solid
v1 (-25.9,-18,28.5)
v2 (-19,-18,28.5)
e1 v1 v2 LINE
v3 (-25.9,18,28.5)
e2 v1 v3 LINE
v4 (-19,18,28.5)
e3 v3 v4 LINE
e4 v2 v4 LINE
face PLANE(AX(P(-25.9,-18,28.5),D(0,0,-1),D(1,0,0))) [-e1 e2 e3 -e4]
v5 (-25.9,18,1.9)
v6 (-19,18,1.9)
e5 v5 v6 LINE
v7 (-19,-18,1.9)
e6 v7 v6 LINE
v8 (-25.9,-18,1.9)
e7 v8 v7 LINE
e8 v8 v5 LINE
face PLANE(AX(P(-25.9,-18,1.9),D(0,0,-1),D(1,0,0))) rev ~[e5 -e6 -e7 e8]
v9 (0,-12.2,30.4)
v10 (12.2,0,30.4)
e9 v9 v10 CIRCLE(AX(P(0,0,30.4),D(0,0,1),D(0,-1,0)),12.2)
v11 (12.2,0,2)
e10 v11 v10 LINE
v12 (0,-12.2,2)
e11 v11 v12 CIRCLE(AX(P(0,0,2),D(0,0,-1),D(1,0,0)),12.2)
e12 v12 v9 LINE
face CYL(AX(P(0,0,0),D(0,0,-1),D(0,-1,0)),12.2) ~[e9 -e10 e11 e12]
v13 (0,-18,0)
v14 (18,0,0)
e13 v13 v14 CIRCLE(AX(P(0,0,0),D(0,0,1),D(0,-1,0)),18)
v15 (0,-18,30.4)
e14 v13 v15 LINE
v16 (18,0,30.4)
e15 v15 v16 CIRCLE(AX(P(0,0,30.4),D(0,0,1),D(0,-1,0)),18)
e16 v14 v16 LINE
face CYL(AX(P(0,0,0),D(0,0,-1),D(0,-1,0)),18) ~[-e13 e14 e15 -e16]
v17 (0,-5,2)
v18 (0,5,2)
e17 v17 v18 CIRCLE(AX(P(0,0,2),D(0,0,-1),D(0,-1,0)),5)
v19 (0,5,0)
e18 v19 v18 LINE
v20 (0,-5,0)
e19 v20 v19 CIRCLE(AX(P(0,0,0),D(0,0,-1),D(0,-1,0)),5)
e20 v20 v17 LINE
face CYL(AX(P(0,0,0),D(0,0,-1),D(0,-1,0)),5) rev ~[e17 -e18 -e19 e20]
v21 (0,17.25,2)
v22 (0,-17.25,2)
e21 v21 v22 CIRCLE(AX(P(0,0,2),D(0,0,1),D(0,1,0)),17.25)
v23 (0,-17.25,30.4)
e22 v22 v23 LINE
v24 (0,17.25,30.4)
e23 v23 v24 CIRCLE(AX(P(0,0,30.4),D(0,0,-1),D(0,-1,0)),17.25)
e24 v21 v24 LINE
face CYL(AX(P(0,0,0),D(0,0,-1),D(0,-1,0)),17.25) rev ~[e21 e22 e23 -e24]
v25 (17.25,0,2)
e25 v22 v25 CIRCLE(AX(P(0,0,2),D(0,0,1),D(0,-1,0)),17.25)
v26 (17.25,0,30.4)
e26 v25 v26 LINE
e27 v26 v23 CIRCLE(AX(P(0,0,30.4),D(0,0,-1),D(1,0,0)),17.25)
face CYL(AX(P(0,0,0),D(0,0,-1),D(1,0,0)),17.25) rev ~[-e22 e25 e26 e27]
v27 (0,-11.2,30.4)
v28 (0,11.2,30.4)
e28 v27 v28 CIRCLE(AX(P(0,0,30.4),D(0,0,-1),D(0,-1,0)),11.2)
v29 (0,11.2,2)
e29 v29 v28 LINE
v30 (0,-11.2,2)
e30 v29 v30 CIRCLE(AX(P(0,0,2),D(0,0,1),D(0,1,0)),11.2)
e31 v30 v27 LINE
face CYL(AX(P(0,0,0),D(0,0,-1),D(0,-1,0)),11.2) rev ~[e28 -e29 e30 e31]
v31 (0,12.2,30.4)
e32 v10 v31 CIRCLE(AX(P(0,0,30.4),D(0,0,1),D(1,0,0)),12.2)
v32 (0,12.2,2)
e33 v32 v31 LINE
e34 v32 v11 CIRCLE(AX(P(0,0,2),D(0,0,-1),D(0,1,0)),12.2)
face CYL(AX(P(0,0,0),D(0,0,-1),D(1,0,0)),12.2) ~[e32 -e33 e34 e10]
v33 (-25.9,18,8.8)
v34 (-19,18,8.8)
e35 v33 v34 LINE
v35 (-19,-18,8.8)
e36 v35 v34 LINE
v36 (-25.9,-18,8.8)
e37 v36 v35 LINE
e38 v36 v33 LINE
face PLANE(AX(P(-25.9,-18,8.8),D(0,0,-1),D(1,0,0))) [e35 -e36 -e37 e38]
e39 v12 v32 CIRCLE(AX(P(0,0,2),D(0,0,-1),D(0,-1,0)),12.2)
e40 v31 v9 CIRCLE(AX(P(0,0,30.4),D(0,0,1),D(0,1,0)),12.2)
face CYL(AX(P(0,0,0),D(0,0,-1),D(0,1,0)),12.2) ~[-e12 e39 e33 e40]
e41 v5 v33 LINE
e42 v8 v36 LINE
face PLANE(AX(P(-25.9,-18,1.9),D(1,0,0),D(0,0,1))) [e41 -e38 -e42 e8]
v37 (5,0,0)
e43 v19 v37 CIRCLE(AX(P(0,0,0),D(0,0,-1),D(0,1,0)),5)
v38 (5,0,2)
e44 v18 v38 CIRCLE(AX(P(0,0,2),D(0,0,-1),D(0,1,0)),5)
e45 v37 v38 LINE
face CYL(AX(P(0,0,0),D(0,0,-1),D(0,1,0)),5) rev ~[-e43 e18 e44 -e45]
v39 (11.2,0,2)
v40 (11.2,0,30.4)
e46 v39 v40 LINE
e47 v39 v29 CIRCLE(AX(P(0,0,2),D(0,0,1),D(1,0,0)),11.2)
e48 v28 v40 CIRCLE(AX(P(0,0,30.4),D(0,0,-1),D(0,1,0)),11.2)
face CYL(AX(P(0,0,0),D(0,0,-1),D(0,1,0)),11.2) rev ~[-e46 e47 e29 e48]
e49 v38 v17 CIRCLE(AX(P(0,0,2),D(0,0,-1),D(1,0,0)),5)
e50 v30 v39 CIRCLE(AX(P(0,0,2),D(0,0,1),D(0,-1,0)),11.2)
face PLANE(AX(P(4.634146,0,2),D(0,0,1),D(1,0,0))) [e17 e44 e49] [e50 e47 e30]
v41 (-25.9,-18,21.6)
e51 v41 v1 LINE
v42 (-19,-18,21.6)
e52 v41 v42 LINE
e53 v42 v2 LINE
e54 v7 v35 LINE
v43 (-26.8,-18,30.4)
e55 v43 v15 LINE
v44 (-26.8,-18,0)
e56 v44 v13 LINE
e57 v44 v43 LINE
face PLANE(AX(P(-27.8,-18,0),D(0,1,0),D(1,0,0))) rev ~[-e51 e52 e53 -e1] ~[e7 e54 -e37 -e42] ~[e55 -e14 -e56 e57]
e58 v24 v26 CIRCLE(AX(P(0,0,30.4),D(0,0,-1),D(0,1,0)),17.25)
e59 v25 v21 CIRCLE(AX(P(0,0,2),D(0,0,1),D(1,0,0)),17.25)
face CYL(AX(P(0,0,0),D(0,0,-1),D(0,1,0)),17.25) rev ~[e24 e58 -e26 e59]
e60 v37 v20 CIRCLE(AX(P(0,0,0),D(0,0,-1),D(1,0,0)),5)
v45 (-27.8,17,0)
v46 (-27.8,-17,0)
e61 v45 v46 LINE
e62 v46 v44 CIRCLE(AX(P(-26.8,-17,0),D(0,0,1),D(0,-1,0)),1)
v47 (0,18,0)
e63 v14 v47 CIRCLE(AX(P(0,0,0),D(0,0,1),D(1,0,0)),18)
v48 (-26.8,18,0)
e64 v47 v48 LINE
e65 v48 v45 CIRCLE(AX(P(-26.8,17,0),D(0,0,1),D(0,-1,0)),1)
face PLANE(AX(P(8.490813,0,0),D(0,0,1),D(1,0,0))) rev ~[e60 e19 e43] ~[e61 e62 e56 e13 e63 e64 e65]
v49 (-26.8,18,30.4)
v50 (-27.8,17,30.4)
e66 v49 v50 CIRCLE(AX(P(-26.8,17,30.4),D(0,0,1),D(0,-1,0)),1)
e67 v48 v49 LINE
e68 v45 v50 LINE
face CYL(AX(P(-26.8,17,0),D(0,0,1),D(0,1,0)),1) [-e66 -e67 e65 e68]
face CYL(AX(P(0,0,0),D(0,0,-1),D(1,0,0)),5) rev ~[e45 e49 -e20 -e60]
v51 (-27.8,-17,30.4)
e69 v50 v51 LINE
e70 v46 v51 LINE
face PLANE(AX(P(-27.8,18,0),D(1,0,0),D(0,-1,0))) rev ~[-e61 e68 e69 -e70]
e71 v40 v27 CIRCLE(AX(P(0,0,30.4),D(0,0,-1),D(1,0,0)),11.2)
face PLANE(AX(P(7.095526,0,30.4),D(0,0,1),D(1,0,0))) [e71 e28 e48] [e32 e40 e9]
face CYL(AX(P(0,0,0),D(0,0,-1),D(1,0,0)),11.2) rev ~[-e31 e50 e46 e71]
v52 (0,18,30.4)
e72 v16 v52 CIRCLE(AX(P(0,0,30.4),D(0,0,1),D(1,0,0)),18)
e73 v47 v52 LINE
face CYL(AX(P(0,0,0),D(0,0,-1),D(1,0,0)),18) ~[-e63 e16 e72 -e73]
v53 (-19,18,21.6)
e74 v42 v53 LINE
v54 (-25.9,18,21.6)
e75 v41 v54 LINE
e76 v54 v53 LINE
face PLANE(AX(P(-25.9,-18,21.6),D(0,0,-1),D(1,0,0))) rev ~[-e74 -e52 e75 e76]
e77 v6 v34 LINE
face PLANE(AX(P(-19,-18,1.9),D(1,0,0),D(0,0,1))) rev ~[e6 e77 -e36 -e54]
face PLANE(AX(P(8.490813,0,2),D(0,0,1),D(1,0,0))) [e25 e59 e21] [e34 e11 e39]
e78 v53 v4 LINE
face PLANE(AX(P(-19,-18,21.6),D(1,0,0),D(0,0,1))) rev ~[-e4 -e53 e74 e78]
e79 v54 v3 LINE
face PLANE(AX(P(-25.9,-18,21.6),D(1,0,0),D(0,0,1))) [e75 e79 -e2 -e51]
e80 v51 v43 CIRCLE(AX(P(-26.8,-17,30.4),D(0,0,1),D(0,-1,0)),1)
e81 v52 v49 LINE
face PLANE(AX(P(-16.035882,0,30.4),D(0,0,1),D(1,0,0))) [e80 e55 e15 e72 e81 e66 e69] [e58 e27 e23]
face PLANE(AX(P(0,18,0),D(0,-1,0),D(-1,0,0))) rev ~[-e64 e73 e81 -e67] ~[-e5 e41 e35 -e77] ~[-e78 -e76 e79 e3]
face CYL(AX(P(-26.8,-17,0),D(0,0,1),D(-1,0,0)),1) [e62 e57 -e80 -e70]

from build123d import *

# Parameters (mm, degrees)
F1_DEPTH = 30.4
F2_DEPTH = 2
F3_W     = 6.9
F3_H     = 6.9
F4_DEPTH = 50
F5_R     = 1
F6_DEPTH = 30.4


# Not quite as in the source:
# - a feature names something its author has since deleted; it is built from what else it names


with BuildPart() as f1:
    # F0 (on Top) → F1 (new body)
    with BuildSketch(Plane.XY):
        with BuildLine():
            ThreePointArc((0, -18), (-18, 0), (0, 18))
            Line((0, 18), (-27.8, 18))
            Line((-27.8, 18), (-27.8, -18))
            Line((-27.8, -18), (0, -18))
        make_face()
        with BuildLine():
            ThreePointArc((0, -17.25), (-17.25, 0), (0, 17.25))
            Line((0, 17.25), (0, 18))
            ThreePointArc((0, 18), (-18, 0), (0, -18))
            Line((0, -18), (0, -17.25))
        make_face()
        with BuildLine():
            ThreePointArc((0, 17.25), (12.1975919755, 12.1975919755), (17.25, 0))
            ThreePointArc((17.25, 0), (12.1975919755, -12.1975919755), (0, -17.25))
            Line((0, -17.25), (0, -18))
            ThreePointArc((0, -18), (12.7279220614, -12.7279220614), (18, 0))
            ThreePointArc((18, 0), (12.7279220614, 12.7279220614), (0, 18))
            Line((0, 18), (0, 17.25))
        make_face()
    extrude(amount=F1_DEPTH)

    # F0 (on Top) → F2 (join)
    with BuildSketch(Plane.XY):
        with BuildLine():
            ThreePointArc((0, -17.25), (12.1975919755, -12.1975919755), (17.25, 0))
            ThreePointArc((17.25, 0), (12.1975919755, 12.1975919755), (0, 17.25))
            Line((0, 17.25), (0, 12.2))
            ThreePointArc((0, 12.2), (8.6267027305, 8.6267027305), (12.2, 0))
            ThreePointArc((12.2, 0), (8.6267027305, -8.6267027305), (0, -12.2))
            Line((0, -12.2), (0, -17.25))
        make_face()
        with BuildLine():
            Line((0, 12.2), (0, 17.25))
            ThreePointArc((0, 17.25), (-17.25, 0), (0, -17.25))
            Line((0, -17.25), (0, -12.2))
            ThreePointArc((0, -12.2), (-12.2, 0), (0, 12.2))
        make_face()
    extrude(amount=F2_DEPTH)

    # F3 (on face) → F4 (cut)
    with BuildSketch(Plane.XZ.offset(18)):
        with Locations((-22.45, 25.05)):
            Rectangle(F3_W, F3_H)
        with Locations((-22.45, 5.35)):
            Rectangle(F3_W, F3_H)
    extrude(amount=-F4_DEPTH, mode=Mode.SUBTRACT)

    # F5
    f5_edges = [f1.edges().sort_by_distance(p)[0] for p in [
        (-27.8, 18, 15.2),
        (-27.8, -18, 15.2),
    ]]
    fillet(f5_edges, radius=F5_R)



with BuildPart() as f2:
    # F0 (on Top) → F2, piece 2 (new body)
    with BuildSketch(Plane.XY):
        with BuildLine():
            ThreePointArc((11.2, 0), (7.9195959493, 7.9195959493), (0, 11.2))
            Line((0, 11.2), (0, 5))
            ThreePointArc((0, 5), (3.5355339059, 3.5355339059), (5, 0))
            ThreePointArc((5, 0), (3.5355339059, -3.5355339059), (0, -5))
            Line((0, -5), (0, -11.2))
            ThreePointArc((0, -11.2), (7.9195959493, -7.9195959493), (11.2, 0))
        make_face()
        with BuildLine():
            Line((0, 5), (0, 11.2))
            ThreePointArc((0, 11.2), (-11.2, 0), (0, -11.2))
            Line((0, -11.2), (0, -5))
            ThreePointArc((0, -5), (-5, 0), (0, 5))
        make_face()
    extrude(amount=F2_DEPTH)


with BuildPart() as f1_1:
    add(f1.part)

    add(f2.part)  # F6 merges F2
    # F0 (on Top) → F6 (join, through all)
    with BuildSketch(Plane.XY):
        with BuildLine():
            ThreePointArc((12.2, 0), (8.6267027305, 8.6267027305), (0, 12.2))
            Line((0, 12.2), (0, 11.2))
            ThreePointArc((0, 11.2), (7.9195959493, 7.9195959493), (11.2, 0))
            ThreePointArc((11.2, 0), (7.9195959493, -7.9195959493), (0, -11.2))
            Line((0, -11.2), (0, -12.2))
            ThreePointArc((0, -12.2), (8.6267027305, -8.6267027305), (12.2, 0))
        make_face()
        with BuildLine():
            Line((0, 11.2), (0, 12.2))
            ThreePointArc((0, 12.2), (-12.2, 0), (0, -12.2))
            Line((0, -12.2), (0, -11.2))
            ThreePointArc((0, -11.2), (-11.2, 0), (0, 11.2))
        make_face()
    extrude(amount=F6_DEPTH)


solid = f1_1.part
